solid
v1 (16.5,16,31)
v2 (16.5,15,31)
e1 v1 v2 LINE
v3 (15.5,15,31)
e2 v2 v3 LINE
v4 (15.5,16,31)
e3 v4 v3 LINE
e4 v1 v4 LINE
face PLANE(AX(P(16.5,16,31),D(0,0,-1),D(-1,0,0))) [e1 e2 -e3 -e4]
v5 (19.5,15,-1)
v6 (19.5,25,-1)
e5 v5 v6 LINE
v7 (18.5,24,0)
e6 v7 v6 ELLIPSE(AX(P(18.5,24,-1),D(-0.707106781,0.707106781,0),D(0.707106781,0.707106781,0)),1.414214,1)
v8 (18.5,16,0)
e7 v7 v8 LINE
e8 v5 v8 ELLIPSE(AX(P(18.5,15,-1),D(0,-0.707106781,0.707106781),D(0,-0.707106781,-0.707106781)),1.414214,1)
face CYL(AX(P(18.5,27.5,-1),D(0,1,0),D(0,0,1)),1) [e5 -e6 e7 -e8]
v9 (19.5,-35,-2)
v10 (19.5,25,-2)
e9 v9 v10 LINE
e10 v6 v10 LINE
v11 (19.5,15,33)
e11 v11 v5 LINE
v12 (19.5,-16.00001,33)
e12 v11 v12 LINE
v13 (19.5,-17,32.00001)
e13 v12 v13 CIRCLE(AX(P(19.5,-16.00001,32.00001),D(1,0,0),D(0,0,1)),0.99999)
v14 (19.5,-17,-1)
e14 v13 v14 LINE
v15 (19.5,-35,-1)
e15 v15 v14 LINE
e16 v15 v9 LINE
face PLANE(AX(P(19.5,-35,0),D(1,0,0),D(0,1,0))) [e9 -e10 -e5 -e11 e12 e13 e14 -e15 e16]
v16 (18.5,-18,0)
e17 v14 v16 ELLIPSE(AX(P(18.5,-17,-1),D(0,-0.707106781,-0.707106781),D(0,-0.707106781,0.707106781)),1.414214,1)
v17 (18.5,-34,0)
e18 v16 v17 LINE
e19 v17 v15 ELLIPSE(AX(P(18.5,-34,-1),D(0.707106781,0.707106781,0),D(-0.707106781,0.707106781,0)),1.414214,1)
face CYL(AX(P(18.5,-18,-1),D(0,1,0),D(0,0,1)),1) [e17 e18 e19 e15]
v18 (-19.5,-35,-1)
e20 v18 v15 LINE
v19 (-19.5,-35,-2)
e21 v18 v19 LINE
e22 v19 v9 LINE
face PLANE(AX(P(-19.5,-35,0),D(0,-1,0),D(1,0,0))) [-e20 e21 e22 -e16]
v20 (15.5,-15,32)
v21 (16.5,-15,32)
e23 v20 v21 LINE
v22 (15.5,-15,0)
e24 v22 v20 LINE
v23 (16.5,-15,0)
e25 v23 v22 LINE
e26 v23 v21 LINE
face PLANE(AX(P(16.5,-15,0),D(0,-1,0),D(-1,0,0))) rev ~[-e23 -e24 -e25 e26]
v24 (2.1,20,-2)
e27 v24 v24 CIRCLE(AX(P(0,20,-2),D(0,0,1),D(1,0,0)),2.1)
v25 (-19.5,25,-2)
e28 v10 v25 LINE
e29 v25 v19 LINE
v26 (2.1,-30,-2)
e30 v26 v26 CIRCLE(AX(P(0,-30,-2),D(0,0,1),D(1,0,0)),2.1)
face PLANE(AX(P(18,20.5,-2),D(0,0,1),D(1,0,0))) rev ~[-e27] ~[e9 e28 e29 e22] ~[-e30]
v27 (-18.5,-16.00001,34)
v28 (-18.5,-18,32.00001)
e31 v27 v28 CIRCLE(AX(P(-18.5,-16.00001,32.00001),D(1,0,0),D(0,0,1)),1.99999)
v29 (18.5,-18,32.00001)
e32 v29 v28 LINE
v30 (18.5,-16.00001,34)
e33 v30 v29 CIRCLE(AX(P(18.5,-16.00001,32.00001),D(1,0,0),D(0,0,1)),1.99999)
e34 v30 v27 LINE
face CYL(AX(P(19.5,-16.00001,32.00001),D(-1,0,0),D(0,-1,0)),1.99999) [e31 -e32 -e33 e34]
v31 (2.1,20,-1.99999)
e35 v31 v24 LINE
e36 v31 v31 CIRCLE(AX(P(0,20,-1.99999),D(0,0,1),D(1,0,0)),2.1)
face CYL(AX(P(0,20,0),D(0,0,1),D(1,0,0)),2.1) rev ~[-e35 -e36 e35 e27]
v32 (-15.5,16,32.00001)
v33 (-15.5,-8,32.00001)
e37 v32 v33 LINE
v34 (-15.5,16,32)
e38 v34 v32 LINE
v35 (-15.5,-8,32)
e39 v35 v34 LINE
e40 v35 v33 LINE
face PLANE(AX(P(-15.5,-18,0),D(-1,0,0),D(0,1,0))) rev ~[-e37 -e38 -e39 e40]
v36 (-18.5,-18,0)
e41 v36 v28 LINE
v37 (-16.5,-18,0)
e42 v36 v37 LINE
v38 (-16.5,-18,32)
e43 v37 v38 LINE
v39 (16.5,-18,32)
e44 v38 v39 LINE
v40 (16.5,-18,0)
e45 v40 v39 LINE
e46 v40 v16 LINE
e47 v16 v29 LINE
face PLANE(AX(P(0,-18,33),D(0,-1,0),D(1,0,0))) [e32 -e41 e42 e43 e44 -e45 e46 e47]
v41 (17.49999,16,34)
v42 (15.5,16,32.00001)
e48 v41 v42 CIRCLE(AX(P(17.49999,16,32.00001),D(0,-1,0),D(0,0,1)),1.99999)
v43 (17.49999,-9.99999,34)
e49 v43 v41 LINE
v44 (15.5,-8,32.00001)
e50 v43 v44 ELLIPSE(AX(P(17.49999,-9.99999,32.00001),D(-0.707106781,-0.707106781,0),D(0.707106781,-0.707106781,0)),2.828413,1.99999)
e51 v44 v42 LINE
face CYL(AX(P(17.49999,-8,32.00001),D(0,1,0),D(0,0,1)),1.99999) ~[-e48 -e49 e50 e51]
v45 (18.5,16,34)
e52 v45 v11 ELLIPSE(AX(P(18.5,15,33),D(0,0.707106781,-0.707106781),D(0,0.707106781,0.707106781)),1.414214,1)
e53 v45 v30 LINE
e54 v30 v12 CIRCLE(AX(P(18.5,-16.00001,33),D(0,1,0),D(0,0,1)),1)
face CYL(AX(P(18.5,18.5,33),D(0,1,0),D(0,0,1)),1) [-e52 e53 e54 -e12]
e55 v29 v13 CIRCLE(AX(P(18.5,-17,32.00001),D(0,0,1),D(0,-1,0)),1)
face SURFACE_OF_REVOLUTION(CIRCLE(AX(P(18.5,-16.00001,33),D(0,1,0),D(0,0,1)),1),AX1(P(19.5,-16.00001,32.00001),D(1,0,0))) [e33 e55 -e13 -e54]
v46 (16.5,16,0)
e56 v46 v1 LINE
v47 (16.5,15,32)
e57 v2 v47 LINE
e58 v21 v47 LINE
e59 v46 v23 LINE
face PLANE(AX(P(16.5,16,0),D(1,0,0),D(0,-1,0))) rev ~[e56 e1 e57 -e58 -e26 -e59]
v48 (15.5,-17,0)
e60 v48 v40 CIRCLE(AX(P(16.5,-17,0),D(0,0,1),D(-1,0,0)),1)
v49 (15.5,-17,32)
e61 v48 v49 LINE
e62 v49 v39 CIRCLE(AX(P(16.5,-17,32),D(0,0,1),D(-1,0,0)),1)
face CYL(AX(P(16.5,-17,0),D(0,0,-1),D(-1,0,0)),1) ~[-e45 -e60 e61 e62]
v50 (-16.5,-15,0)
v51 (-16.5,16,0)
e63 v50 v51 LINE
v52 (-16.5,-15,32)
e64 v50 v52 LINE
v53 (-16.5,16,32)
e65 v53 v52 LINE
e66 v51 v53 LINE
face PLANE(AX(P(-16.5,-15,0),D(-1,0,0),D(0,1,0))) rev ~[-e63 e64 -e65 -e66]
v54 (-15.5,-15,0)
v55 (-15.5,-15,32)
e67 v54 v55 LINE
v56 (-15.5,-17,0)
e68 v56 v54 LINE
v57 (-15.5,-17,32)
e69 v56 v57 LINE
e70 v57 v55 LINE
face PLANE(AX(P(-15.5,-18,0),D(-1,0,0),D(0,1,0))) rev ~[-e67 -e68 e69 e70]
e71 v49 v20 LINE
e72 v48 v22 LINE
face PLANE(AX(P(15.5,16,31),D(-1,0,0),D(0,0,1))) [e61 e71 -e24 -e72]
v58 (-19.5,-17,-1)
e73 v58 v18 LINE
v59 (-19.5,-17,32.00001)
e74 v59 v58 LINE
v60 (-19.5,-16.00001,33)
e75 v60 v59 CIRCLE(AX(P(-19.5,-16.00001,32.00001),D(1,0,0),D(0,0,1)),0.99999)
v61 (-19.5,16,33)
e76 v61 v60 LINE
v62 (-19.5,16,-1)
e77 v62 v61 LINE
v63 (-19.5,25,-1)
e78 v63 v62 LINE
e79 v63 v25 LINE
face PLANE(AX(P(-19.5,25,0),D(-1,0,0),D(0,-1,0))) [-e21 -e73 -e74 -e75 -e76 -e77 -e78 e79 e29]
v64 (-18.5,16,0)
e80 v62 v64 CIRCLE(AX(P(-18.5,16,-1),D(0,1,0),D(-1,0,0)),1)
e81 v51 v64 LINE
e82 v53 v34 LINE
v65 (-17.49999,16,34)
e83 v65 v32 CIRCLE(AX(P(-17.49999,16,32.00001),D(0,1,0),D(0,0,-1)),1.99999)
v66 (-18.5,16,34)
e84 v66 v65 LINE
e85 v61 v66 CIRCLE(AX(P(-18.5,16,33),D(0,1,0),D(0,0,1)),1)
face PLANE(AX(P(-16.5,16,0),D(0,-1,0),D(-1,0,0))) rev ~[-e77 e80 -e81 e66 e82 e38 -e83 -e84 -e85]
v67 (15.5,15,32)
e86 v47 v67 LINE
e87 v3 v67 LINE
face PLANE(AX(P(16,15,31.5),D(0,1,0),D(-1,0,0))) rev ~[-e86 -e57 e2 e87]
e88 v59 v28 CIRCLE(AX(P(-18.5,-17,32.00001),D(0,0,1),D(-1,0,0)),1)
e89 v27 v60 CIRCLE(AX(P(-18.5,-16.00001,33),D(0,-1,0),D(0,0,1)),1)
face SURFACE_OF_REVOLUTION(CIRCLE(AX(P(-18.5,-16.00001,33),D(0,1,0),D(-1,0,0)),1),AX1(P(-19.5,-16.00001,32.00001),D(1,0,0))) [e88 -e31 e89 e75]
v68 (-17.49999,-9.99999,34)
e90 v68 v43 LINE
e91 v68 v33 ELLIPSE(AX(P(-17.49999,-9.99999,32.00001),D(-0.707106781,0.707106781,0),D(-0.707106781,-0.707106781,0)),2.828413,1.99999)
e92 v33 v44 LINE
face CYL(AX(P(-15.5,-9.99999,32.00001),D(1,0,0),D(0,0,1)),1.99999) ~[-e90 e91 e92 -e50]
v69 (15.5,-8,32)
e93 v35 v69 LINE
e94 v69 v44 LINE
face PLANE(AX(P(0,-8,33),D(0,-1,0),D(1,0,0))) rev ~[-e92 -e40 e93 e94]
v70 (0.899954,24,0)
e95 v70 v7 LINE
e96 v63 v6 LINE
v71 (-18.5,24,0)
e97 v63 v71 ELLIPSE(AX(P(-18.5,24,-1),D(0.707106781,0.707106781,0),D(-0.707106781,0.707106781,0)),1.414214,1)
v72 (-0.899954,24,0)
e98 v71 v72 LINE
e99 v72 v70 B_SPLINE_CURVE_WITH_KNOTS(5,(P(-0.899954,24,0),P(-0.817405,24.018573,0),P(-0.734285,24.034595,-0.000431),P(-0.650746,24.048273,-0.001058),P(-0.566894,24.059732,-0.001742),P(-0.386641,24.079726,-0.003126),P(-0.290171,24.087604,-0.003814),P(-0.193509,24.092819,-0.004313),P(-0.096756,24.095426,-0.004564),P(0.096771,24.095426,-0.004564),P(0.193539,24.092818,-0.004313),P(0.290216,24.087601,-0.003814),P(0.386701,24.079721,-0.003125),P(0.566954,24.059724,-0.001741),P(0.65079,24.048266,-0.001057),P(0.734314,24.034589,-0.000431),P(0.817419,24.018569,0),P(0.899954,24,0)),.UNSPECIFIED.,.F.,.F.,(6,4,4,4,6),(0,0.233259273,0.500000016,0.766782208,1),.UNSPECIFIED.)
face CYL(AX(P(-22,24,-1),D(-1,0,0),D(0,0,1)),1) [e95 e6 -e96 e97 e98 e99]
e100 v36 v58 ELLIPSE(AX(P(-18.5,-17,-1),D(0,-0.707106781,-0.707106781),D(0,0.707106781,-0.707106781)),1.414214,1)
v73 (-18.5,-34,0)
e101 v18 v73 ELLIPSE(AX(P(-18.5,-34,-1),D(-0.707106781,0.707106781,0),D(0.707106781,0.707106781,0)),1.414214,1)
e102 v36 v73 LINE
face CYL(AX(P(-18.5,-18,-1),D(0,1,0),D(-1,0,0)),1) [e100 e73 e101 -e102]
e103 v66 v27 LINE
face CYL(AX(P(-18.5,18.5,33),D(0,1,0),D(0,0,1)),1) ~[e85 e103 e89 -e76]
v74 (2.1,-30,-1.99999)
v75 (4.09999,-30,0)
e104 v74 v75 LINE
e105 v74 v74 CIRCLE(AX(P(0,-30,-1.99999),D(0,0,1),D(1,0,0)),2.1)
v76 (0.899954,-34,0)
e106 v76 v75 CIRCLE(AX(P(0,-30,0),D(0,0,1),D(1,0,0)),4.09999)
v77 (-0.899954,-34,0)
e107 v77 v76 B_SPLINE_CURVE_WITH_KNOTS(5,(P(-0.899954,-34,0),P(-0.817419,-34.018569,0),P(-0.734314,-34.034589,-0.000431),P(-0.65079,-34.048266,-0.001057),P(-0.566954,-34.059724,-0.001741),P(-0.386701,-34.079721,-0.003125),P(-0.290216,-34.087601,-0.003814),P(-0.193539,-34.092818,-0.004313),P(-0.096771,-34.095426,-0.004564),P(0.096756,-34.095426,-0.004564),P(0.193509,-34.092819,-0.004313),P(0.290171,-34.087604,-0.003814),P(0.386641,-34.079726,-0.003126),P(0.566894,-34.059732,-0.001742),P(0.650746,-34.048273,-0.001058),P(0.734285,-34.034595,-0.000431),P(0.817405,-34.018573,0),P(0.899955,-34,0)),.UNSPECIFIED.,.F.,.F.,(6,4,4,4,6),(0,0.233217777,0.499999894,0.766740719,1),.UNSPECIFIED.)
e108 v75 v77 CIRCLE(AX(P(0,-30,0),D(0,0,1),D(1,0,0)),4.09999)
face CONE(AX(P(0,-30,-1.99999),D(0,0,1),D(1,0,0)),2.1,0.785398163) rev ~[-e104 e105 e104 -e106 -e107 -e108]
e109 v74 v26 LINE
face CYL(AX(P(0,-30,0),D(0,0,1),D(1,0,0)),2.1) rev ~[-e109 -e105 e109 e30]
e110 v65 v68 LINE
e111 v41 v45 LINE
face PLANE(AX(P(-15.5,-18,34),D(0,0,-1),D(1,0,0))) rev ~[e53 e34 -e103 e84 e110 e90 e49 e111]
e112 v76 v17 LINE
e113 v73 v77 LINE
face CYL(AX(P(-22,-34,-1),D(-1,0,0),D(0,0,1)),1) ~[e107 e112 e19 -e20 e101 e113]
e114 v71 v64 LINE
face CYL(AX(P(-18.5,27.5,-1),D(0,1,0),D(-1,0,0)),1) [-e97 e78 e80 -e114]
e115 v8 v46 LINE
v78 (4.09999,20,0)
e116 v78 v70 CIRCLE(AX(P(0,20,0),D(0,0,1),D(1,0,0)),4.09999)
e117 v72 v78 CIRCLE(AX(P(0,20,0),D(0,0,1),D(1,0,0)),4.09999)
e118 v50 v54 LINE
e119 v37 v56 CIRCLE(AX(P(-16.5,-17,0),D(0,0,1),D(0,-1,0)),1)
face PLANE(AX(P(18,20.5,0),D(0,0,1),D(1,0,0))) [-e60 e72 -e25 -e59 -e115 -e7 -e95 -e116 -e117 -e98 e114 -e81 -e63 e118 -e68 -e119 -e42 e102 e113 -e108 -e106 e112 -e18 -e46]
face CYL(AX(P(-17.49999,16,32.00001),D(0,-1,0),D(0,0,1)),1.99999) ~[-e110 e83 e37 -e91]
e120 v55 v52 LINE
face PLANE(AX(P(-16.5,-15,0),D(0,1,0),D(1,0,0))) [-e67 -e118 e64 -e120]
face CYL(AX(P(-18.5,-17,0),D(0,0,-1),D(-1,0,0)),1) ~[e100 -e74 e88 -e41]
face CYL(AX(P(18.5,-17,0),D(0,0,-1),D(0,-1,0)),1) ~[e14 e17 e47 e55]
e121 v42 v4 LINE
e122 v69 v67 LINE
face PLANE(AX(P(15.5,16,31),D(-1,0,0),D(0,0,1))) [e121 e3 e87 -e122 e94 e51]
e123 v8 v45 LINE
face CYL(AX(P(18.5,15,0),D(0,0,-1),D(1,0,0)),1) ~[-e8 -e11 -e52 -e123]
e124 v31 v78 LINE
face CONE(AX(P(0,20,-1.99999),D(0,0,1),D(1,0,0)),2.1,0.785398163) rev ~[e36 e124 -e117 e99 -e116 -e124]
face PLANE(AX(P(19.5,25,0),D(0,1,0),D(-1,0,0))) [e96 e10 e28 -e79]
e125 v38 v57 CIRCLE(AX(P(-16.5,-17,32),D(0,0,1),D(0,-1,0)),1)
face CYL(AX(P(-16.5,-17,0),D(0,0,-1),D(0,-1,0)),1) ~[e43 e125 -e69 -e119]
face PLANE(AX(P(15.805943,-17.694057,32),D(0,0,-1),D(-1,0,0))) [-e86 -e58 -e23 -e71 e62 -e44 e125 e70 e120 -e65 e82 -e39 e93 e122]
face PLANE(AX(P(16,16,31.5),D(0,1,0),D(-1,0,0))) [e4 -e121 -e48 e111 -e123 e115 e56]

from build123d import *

# Parameters (mm, degrees)
F0_W          = 3
F0_H          = 9
F0_H_2        = 7
F0_H_3        = 3
F0_R          = 2.1
F0_W_2        = 1
F1_DEPTH      = 2
F2_DEPTH      = 34
F3_W          = 4
F3_H          = 2
F4_DEPTH      = 34
F5_SIZE       = 1.99999
F7_W          = 1
F7_H          = 1
F8_DEPTH      = 1
F3_W_2        = 31
F9_DEPTH      = 10
F10_R         = 1.99999
F11_T1_DEPTH  = 32
F11_T3_DEPTH  = 34.50001
F11_T5_DEPTH  = 32.00001
F11_T7_DEPTH  = 19.5
F11_T9_DEPTH  = 11.5
F11_T11_DEPTH = 44
F11_T13_DEPTH = 36.5
F11_T16_ANGLE = 90
F11_T18_ANGLE = 90
F11_T23_DEPTH = 34.50001
F11_T27_DEPTH = 22
F11_T34_DEPTH = 14
F11_T38_DEPTH = 39
F11_T45_DEPTH = 22
F11_T49_DEPTH = 34.50001


# Not quite as in the source:
# - a fillet or chamfer that OpenCascade refuses, or shapes differently, is made with other operations: its cross-section is extruded or revolved along the edge and cut away or added
# - a fillet or chamfer is up to 0.001 mm smaller than in the source, because OpenCascade refuses the exact size
# - a feature of the source that left no trace in its solid (it failed there, or was rolled back) is left out
# - a feature names something its author has since deleted; it is built from what else it names


with BuildPart() as f1:
    # F0 (on Top) → F1 (new body)
    with BuildSketch(Plane.XY):
        with Locations((18, 20.5)):
            Rectangle(F0_W, F0_H)
        with Locations((-18, 20.5)):
            Rectangle(F0_W, F0_H)
        with Locations((18, -21.5)):
            Rectangle(F0_W, F0_H_2)
        with Locations((-18, -21.5)):
            Rectangle(F0_W, F0_H_2)
        with Locations((18, -16.5)):
            Rectangle(F0_W, F0_H_3)
        with Locations((-18, -16.5)):
            Rectangle(F0_W, F0_H_3)
        Polygon((19.5, -35), (19.5, -25), (16.5, -25), (-16.5, -25), (-19.5, -25), (-19.5, -35), align=None)
        with Locations((0, -30)):
            Circle(F0_R, mode=Mode.SUBTRACT)
        Polygon((19.5, -15), (19.5, 16), (16.5, 16), (16.5, 15), (16.5, -15), align=None)
        Polygon((-16.5, 15), (-16.5, 16), (-19.5, 16), (-19.5, 15), (-19.5, -15), (-16.5, -15), align=None)
        Polygon((16.5, 16), (16.5, 25), (-16.5, 25), (-16.5, 16), (-16.5, 15), (16.5, 15), align=None)
        with Locations((0, 20)):
            Circle(F0_R, mode=Mode.SUBTRACT)
        Polygon((16.5, -15), (16.5, 15), (-16.5, 15), (-16.5, -15), (-15.5, -15), (15.5, -15), align=None)
        with Locations((-16, -16.5)):
            Rectangle(F0_W_2, F0_H_3)
        with Locations((16, -16.5)):
            Rectangle(F0_W_2, F0_H_3)
        Polygon((16.5, -25), (16.5, -18), (15.5, -18), (15.5, -15), (-15.5, -15), (-15.5, -18), (-16.5, -18), (-16.5, -25), align=None)
        with Locations((0, -20)):
            Circle(F0_R, mode=Mode.SUBTRACT)
        with Locations((0, -20)):
            Circle(F0_R)
    extrude(amount=-F1_DEPTH)

    # F0 (on Top) → F2 (join)
    with BuildSketch(Plane.XY):
        Polygon((-16.5, 15), (-16.5, 16), (-19.5, 16), (-19.5, 15), (-19.5, -15), (-16.5, -15), align=None)
        with Locations((-18, -16.5)):
            Rectangle(F0_W, F0_H_3)
        with Locations((18, -16.5)):
            Rectangle(F0_W, F0_H_3)
        with Locations((16, -16.5)):
            Rectangle(F0_W_2, F0_H_3)
        with Locations((-16, -16.5)):
            Rectangle(F0_W_2, F0_H_3)
        Polygon((19.5, -15), (19.5, 16), (16.5, 16), (16.5, 15), (16.5, -15), align=None)
    extrude(amount=F2_DEPTH)

    # F3 (on face) → F4 (join)
    with BuildSketch(Plane.XZ.offset(18)):
        with Locations((-17.5, 33)):
            Rectangle(F3_W, F3_H)
        with Locations((17.5, 33)):
            Rectangle(F3_W, F3_H)
    extrude(amount=-F4_DEPTH)

    # F5 (size 2 in the source; OpenCascade refuses exactly that, so slightly less here)
    f5_edges = [f1.edges().sort_by_distance(p)[0] for p in [
        (-2.1, -30, 0),
        (-2.1, 20, 0),
    ]]
    chamfer(f5_edges, length=F5_SIZE)

    # F7 (on face) → F8 (join)
    with BuildSketch(Plane(origin=(0, 16, 0), x_dir=(-1, 0, 0), z_dir=(0, 1, 0))):
        with Locations((-16, 31.5)):
            Rectangle(F7_W, F7_H)
        Polygon((15.9987417102, 33.0025165796), (15.5, 34), (15.5050715785, 33.0000128605), align=None)
    extrude(amount=-F8_DEPTH)

    # F3 (on face) → F9 (join)
    with BuildSketch(Plane.XZ.offset(18)):
        with Locations((0, 33)):
            Rectangle(F3_W_2, F3_H)
    extrude(amount=-F9_DEPTH)

    # F10 (radius 2 in the source; OpenCascade refuses exactly that, so slightly less here)
    f10_edges = [f1.edges().sort_by_distance(p)[0] for p in [
        (0, -18, 34),
        (-15.5, 4, 34),
        (0, -8, 34),
        (15.5, 4, 34),
    ]]
    fillet(f10_edges, radius=F10_R)

    # F11: fillet of radius 1 on 15 edges, made by hand

    # F11_s2 → F11_t1 (cut)
    with BuildSketch(Plane.XY):
        with BuildLine():
            ThreePointArc((-16.5, -18), (-15.7928932188, -17.7071067812), (-15.5, -17))
            Line((-15.5, -17), (-15.5, -18))
            Line((-15.5, -18), (-16.5, -18))
        make_face()
        with BuildLine():
            ThreePointArc((15.5, -17), (15.7928932188, -17.7071067812), (16.5, -18))
            Line((16.5, -18), (15.5, -18))
            Line((15.5, -18), (15.5, -17))
        make_face()
    extrude(amount=F11_T1_DEPTH, mode=Mode.SUBTRACT)

    # F11_s4 → F11_t3 (cut)
    with BuildSketch(Plane.XZ.offset(-18.5)):
        with BuildLine():
            ThreePointArc((-18.5, 34), (-19.2071067812, 33.7071067812), (-19.5, 33))
            Line((-19.5, 33), (-19.5, 34))
            Line((-19.5, 34), (-18.5, 34))
        make_face()
        with BuildLine():
            ThreePointArc((18.5, 34), (19.2071067812, 33.7071067812), (19.5, 33))
            Line((19.5, 33), (19.5, 34))
            Line((19.5, 34), (18.5, 34))
        make_face()
    extrude(amount=F11_T3_DEPTH, mode=Mode.SUBTRACT)

    # F11_s6 → F11_t5 (cut)
    with BuildSketch(Plane.XY):
        with BuildLine():
            ThreePointArc((-19.5, -17), (-19.2071067812, -17.7071067812), (-18.5, -18))
            Line((-18.5, -18), (-19.5, -18))
            Line((-19.5, -18), (-19.5, -17))
        make_face()
        with BuildLine():
            ThreePointArc((18.5, -18), (19.2071067812, -17.7071067812), (19.5, -17))
            Line((19.5, -17), (19.5, -18))
            Line((19.5, -18), (18.5, -18))
        make_face()
    extrude(amount=F11_T5_DEPTH, mode=Mode.SUBTRACT)

    # F11_s8 → F11_t7 (cut)
    with BuildSketch(Plane.XZ.offset(18)):
        with BuildLine():
            ThreePointArc((-19.5, -1), (-19.2071067812, -0.2928932188), (-18.5, 0))
            Line((-18.5, 0), (-19.5, 0))
            Line((-19.5, 0), (-19.5, -1))
        make_face()
        with BuildLine():
            ThreePointArc((18.5, 0), (19.2071067812, -0.2928932188), (19.5, -1))
            Line((19.5, -1), (19.5, 0))
            Line((19.5, 0), (18.5, 0))
        make_face()
    extrude(amount=F11_T7_DEPTH, mode=Mode.SUBTRACT)

    # F11_s10 → F11_t9 (cut)
    with BuildSketch(Plane.XZ.offset(-27.5)):
        with BuildLine():
            ThreePointArc((-19.5, -1), (-19.2071067812, -0.2928932188), (-18.5, 0))
            Line((-18.5, 0), (-19.5, 0))
            Line((-19.5, 0), (-19.5, -1))
        make_face()
        with BuildLine():
            ThreePointArc((18.5, 0), (19.2071067812, -0.2928932188), (19.5, -1))
            Line((19.5, -1), (19.5, 0))
            Line((19.5, 0), (18.5, 0))
        make_face()
    extrude(amount=F11_T9_DEPTH, mode=Mode.SUBTRACT)

    # F11_s12 → F11_t11 (cut)
    with BuildSketch(Plane.YZ.offset(-22)):
        with BuildLine():
            ThreePointArc((-34, 0), (-34.7071067812, -0.2928932188), (-35, -1))
            Line((-35, -1), (-35, 0))
            Line((-35, 0), (-34, 0))
        make_face()
        with BuildLine():
            ThreePointArc((24, 0), (24.7071067812, -0.2928932188), (25, -1))
            Line((25, -1), (25, 0))
            Line((25, 0), (24, 0))
        make_face()
    extrude(amount=F11_T11_DEPTH, mode=Mode.SUBTRACT)

    # F11_s14 → F11_t13 (cut)
    with BuildSketch(Plane.XY):
        with BuildLine():
            ThreePointArc((19.5, 15), (19.2071067812, 15.7071067812), (18.5, 16))
            Line((18.5, 16), (19.5, 16))
            Line((19.5, 16), (19.5, 15))
        make_face()
    extrude(amount=F11_T13_DEPTH, mode=Mode.SUBTRACT)

    # F11_s15 → F11_t16 (revolve, cut)
    with BuildSketch(Plane.XZ.offset(16.00001)):
        with BuildLine():
            ThreePointArc((-19.5, 33), (-19.2071067812, 33.7071067812), (-18.5, 34))
            Line((-18.5, 34), (-19.5, 34))
            Line((-19.5, 34), (-19.5, 33))
        make_face()
    revolve(axis=Axis((-19.5, -16.00001, 32.00001), (1, 0, 0)), revolution_arc=F11_T16_ANGLE, mode=Mode.SUBTRACT)

    # F11_s17 → F11_t18 (revolve, cut)
    with BuildSketch(Plane.XZ.offset(16.00001)):
        with BuildLine():
            ThreePointArc((18.5, 34), (19.2071067812, 33.7071067812), (19.5, 33))
            Line((19.5, 33), (19.5, 34))
            Line((19.5, 34), (18.5, 34))
        make_face()
    revolve(axis=Axis((19.5, -16.00001, 32.00001), (1, 0, 0)), revolution_arc=F11_T18_ANGLE, mode=Mode.SUBTRACT)


with BuildPart() as f11_tool21:
    # F11_s22 → F11_t23 (new body)
    with BuildSketch(Plane.XY.offset(-2.5)):
        with BuildLine():
            ThreePointArc((-19.5, -17), (-19.2071067812, -17.7071067812), (-18.5, -18))
            Line((-18.5, -18), (-19.5, -18))
            Line((-19.5, -18), (-19.5, -17))
        make_face()
    extrude(amount=F11_T23_DEPTH)

    split(bisect_by=Plane.XY, keep=Keep.BOTTOM)


with BuildPart() as f11_tool25:
    # F11_s26 → F11_t27 (new body)
    with BuildSketch(Plane.XZ.offset(15.5)):
        with BuildLine():
            ThreePointArc((-19.5, -1), (-19.2071067812, -0.2928932188), (-18.5, 0))
            Line((-18.5, 0), (-19.5, 0))
            Line((-19.5, 0), (-19.5, -1))
        make_face()
    extrude(amount=F11_T27_DEPTH)

    split(bisect_by=Plane.XZ.offset(18), keep=Keep.BOTTOM)


with BuildPart() as f11_tool21_1:
    add(f11_tool21.part)

    # F11_t29: intersect F11_tool25
    add(f11_tool25.part, mode=Mode.INTERSECT)


with BuildPart() as f1_1:
    add(f1.part)

    # F11_t19: cut F11_tool21
    add(f11_tool21_1.part, mode=Mode.SUBTRACT)


with BuildPart() as f11_tool32:
    # F11_s33 → F11_t34 (new body)
    with BuildSketch(Plane.XZ.offset(-13.5)):
        with BuildLine():
            ThreePointArc((18.5, 0), (19.2071067812, -0.2928932188), (19.5, -1))
            Line((19.5, -1), (19.5, 0))
            Line((19.5, 0), (18.5, 0))
        make_face()
    extrude(amount=-F11_T34_DEPTH)

    split(bisect_by=Plane.XZ.offset(-16), keep=Keep.TOP)


with BuildPart() as f11_tool36:
    # F11_s37 → F11_t38 (new body)
    with BuildSketch(Plane.XY.offset(-2.5)):
        with BuildLine():
            ThreePointArc((19.5, 15), (19.2071067812, 15.7071067812), (18.5, 16))
            Line((18.5, 16), (19.5, 16))
            Line((19.5, 16), (19.5, 15))
        make_face()
    extrude(amount=F11_T38_DEPTH)

    split(bisect_by=Plane.XY, keep=Keep.BOTTOM)


with BuildPart() as f11_tool32_1:
    add(f11_tool32.part)

    # F11_t40: intersect F11_tool36
    add(f11_tool36.part, mode=Mode.INTERSECT)


with BuildPart() as f1_2:
    add(f1_1.part)

    # F11_t30: cut F11_tool32
    add(f11_tool32_1.part, mode=Mode.SUBTRACT)


with BuildPart() as f11_tool43:
    # F11_s44 → F11_t45 (new body)
    with BuildSketch(Plane.XZ.offset(37.5)):
        with BuildLine():
            ThreePointArc((18.5, 0), (19.2071067812, -0.2928932188), (19.5, -1))
            Line((19.5, -1), (19.5, 0))
            Line((19.5, 0), (18.5, 0))
        make_face()
    extrude(amount=-F11_T45_DEPTH)

    split(bisect_by=Plane.XZ.offset(18), keep=Keep.BOTTOM)


with BuildPart() as f11_tool47:
    # F11_s48 → F11_t49 (new body)
    with BuildSketch(Plane.XY.offset(32.00001)):
        with BuildLine():
            ThreePointArc((18.5, -18), (19.2071067812, -17.7071067812), (19.5, -17))
            Line((19.5, -17), (19.5, -18))
            Line((19.5, -18), (18.5, -18))
        make_face()
    extrude(amount=-F11_T49_DEPTH)

    split(bisect_by=Plane.XY, keep=Keep.BOTTOM)


with BuildPart() as f11_tool43_1:
    add(f11_tool43.part)

    # F11_t51: intersect F11_tool47
    add(f11_tool47.part, mode=Mode.INTERSECT)


with BuildPart() as f1_3:
    add(f1_2.part)

    # F11_t41: cut F11_tool43
    add(f11_tool43_1.part, mode=Mode.SUBTRACT)


solid = f1_3.part
